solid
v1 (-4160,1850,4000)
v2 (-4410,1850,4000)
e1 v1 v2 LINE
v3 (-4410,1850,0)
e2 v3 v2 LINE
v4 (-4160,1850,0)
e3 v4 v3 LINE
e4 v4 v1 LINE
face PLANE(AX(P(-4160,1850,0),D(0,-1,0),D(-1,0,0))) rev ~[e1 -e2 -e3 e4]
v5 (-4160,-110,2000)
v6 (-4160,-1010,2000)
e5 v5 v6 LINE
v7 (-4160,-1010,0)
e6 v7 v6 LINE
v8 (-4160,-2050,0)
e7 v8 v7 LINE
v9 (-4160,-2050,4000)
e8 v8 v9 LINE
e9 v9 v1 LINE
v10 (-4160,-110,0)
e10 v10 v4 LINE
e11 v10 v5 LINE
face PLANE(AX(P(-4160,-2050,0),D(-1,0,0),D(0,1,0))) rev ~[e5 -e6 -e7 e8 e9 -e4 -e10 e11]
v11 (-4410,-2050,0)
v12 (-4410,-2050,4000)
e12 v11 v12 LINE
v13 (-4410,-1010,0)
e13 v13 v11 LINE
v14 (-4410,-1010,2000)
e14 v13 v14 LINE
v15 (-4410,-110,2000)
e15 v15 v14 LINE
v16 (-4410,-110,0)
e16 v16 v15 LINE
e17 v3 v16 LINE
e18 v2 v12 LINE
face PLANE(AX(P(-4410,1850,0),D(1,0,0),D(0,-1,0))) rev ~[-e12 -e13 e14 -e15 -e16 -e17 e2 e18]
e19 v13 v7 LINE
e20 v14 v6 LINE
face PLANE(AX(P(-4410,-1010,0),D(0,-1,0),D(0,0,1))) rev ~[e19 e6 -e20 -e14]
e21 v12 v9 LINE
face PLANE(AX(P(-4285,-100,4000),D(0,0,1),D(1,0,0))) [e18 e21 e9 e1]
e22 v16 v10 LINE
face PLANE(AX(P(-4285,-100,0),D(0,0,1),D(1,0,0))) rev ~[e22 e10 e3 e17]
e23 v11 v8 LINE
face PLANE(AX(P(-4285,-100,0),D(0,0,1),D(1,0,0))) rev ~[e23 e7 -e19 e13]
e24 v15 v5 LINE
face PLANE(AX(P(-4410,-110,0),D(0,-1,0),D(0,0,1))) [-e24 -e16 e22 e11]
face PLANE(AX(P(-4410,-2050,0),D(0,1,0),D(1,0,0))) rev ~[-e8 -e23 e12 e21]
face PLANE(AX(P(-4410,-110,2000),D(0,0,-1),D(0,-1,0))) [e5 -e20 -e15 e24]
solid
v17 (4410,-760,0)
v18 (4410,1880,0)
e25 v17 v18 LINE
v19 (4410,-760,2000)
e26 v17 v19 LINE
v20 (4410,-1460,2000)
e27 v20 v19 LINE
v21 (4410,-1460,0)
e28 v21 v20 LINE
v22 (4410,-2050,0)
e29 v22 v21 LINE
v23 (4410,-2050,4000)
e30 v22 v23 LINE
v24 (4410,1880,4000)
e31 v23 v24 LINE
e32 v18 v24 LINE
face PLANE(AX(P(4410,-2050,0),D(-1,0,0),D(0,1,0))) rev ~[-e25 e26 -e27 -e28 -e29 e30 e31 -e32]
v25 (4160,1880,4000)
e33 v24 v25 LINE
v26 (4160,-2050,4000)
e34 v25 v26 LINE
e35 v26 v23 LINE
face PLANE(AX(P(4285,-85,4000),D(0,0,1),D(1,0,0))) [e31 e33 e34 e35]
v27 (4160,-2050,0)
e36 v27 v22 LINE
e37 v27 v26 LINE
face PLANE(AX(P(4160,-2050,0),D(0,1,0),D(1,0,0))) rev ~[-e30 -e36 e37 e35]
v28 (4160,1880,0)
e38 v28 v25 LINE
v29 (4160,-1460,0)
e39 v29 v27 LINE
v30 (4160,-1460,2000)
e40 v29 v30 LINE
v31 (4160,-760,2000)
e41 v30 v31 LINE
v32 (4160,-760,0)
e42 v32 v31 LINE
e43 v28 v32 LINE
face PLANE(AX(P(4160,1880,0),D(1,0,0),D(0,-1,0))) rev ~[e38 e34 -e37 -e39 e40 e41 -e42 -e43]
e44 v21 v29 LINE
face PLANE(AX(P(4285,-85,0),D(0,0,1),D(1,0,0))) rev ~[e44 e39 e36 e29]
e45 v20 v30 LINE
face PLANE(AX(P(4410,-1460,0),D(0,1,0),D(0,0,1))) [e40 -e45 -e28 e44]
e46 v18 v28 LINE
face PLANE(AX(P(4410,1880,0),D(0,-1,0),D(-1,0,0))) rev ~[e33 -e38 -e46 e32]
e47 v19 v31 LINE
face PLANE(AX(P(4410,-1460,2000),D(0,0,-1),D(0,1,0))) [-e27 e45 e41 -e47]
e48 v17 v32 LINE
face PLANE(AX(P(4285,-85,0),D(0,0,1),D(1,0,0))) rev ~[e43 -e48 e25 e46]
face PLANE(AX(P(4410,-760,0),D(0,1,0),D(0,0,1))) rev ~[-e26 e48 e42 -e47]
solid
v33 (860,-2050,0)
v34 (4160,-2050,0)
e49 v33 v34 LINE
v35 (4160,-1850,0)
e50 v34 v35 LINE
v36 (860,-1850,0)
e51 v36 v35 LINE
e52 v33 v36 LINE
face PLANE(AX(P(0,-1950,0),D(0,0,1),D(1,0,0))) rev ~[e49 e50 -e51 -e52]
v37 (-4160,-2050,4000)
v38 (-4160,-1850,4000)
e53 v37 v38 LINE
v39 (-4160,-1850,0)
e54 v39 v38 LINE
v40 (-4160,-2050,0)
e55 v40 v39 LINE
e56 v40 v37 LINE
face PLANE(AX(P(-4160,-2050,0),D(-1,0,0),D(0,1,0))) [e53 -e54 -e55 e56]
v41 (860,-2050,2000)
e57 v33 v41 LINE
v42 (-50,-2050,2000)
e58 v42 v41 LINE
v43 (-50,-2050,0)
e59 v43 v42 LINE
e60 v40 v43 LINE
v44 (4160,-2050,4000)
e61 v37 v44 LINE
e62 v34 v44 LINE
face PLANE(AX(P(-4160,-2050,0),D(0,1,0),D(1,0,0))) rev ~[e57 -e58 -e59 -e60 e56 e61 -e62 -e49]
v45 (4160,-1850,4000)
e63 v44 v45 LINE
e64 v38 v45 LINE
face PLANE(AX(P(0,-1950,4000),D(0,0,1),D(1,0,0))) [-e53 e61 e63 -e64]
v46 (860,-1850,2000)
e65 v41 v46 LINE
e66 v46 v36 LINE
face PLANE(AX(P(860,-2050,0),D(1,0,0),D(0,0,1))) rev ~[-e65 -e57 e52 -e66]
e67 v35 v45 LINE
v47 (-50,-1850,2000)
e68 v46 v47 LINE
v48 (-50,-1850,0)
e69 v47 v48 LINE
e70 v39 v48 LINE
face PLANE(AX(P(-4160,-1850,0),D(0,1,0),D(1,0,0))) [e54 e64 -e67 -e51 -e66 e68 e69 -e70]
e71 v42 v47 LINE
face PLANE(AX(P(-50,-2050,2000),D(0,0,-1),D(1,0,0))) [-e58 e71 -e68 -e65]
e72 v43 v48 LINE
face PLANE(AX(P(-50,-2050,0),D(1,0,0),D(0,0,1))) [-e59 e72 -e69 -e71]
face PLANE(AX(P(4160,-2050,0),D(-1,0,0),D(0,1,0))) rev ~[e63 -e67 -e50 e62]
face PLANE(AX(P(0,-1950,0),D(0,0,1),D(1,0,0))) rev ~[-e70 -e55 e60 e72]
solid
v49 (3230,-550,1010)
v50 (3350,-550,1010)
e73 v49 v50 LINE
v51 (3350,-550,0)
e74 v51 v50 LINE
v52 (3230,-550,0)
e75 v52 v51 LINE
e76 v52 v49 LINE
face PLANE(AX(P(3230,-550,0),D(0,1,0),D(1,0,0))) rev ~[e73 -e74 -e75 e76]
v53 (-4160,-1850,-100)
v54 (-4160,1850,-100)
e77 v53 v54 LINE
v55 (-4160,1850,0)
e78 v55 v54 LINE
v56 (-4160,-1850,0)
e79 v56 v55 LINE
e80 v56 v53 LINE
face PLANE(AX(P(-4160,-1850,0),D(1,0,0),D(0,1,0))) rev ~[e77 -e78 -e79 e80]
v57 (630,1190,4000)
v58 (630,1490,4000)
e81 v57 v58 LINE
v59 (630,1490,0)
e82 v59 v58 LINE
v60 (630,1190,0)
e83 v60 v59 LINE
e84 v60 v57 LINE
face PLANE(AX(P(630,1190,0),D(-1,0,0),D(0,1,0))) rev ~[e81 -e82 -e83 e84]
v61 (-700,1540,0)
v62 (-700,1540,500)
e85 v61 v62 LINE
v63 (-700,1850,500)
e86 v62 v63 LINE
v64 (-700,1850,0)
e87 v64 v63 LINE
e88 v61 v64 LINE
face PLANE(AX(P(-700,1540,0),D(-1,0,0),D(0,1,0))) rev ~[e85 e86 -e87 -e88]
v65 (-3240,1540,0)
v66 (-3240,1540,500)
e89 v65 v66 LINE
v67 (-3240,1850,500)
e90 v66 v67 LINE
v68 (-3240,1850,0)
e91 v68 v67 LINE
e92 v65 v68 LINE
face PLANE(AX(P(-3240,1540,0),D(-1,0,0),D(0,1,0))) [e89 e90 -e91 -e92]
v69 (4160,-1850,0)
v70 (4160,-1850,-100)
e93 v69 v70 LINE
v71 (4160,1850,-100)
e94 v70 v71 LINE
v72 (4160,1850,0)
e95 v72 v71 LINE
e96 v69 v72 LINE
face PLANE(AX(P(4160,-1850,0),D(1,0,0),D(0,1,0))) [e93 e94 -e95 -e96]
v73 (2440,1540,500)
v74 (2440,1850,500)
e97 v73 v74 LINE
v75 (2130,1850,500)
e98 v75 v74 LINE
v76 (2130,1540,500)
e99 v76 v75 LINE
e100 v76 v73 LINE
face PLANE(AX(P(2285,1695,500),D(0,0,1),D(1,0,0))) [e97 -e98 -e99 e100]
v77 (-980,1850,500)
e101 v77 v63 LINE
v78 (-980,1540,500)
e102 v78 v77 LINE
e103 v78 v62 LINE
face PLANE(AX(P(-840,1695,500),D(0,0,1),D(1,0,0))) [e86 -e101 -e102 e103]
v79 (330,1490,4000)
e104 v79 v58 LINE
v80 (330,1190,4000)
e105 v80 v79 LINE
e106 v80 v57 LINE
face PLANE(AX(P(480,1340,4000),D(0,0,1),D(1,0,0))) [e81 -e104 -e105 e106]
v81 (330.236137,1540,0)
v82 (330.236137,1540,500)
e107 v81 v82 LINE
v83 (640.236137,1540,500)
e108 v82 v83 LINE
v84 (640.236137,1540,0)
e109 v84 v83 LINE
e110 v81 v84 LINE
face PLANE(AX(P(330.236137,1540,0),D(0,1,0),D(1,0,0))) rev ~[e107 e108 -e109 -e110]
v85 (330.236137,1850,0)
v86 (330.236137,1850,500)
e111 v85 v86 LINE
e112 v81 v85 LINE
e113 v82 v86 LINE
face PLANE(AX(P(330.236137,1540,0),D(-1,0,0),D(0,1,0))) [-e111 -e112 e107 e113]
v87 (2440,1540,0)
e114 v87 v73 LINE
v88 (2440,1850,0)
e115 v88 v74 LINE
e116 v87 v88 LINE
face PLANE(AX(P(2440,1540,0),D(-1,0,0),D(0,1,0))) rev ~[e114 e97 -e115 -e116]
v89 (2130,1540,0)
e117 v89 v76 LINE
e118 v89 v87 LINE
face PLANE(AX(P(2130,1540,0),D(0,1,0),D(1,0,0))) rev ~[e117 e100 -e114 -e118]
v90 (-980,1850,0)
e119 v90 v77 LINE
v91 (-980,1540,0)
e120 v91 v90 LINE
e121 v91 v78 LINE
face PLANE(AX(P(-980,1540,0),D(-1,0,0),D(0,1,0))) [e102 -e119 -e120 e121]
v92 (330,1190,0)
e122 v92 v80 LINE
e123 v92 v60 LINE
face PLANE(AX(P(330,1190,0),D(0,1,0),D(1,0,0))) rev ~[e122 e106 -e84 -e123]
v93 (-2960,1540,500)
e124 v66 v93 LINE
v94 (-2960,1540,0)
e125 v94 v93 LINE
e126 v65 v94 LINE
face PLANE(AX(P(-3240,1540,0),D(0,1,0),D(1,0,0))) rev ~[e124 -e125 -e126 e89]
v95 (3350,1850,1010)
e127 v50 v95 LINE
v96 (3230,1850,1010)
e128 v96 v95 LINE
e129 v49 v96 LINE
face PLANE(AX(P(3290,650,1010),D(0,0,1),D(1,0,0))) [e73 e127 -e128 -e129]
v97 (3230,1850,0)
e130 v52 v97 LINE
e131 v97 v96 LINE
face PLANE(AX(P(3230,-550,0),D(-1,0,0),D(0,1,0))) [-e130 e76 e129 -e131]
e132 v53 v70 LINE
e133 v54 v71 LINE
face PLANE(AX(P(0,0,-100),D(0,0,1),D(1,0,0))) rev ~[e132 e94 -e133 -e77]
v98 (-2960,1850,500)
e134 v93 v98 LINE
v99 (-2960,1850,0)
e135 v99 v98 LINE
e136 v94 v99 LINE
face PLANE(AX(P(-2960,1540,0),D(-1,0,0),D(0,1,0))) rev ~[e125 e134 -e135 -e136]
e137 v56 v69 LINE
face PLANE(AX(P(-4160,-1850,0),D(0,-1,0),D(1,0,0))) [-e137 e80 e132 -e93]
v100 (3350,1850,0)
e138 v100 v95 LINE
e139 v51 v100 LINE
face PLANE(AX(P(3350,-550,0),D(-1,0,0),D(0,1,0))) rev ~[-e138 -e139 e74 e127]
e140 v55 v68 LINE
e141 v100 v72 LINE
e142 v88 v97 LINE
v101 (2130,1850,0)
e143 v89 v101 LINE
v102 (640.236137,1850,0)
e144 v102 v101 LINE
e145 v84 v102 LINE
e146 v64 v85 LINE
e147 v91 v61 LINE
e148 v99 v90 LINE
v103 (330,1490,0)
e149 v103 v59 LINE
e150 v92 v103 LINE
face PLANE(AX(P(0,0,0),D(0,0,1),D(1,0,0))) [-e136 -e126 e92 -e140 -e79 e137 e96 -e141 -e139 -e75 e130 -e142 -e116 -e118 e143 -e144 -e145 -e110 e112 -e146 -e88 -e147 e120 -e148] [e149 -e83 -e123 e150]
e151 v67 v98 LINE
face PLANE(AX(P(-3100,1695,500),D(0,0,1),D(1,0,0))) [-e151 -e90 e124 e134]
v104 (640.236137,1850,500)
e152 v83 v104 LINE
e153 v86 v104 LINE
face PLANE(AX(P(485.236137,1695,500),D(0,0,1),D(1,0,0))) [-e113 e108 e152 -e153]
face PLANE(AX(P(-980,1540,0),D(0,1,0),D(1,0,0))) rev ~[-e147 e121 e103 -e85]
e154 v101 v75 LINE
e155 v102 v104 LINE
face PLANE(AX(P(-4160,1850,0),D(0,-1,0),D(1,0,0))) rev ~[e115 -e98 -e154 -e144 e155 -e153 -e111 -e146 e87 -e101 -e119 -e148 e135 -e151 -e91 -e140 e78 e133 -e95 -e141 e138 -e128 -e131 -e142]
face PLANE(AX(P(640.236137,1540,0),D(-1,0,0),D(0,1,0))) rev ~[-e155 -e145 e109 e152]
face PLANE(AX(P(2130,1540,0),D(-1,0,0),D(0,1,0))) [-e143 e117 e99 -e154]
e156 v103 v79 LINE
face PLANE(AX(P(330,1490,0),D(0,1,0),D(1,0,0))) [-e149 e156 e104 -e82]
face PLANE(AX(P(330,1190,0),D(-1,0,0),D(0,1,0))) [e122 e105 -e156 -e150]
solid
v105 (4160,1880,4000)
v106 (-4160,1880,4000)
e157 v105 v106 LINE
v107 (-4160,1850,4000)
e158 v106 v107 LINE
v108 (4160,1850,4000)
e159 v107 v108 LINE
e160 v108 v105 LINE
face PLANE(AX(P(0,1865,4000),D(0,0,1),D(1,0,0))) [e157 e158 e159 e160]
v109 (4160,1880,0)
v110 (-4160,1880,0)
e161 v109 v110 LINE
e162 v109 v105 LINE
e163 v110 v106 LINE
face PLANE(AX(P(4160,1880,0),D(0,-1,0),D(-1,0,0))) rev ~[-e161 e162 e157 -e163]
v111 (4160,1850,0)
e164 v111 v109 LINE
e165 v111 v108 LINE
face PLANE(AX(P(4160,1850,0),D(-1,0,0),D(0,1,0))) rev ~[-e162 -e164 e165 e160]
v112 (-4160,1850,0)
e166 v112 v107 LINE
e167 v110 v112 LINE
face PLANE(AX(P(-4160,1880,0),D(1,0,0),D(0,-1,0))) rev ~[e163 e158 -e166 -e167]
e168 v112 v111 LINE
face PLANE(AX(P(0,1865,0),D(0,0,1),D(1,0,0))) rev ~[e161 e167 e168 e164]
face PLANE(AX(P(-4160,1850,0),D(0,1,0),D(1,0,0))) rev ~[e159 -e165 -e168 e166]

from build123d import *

# Parameters (mm, degrees)
F1_W      = 8320
F1_H      = 3700
F2_DEPTH  = 100
F3_W      = 300
F3_H      = 300
F4_DEPTH  = 4000
F3_W_2    = 280
F3_H_2    = 310
F3_W_3    = 310
F5_DEPTH  = 500
F3_W_4    = 120
F3_H_3    = 2400
F6_DEPTH  = 1010
F8_DEPTH  = 4000
F9_DEPTH  = 4000
F10_DEPTH = 4000
F7_W      = 8320
F7_H      = 200
F11_DEPTH = 4000
F12_W     = 700
F12_H     = 2000
F13_DEPTH = 8820.001
F14_W     = 900
F14_H     = 2000
F15_DEPTH = 8820.001
F16_W     = 910
F16_H     = 2000
F17_DEPTH = 3930.001


with BuildPart() as f2:
    # F1 (on Top) → F2 (new body)
    with BuildSketch(Plane.XY):
        Rectangle(F1_W, F1_H)
    extrude(amount=-F2_DEPTH)

    # F3 (on face) → F4 (join)
    with BuildSketch(Plane.XY):
        with Locations((480, 1340)):
            Rectangle(F3_W, F3_H)
    extrude(amount=F4_DEPTH)

    # F3 (on face) → F5 (join)
    with BuildSketch(Plane.XY):
        with Locations((-3100, 1695)):
            Rectangle(F3_W_2, F3_H_2)
        with Locations((-840, 1695)):
            Rectangle(F3_W_2, F3_H_2)
        with Locations((2285, 1695)):
            Rectangle(F3_W_3, F3_H_2)
        with Locations((485.2361369133, 1695)):
            Rectangle(F3_W_3, F3_H_2)
    extrude(amount=F5_DEPTH)

    # F3 (on face) → F6 (join)
    with BuildSketch(Plane.XY):
        with Locations((3290, 650)):
            Rectangle(F3_W_4, F3_H_3)
    extrude(amount=F6_DEPTH)


with BuildPart() as f8:
    # F7 (on face) → F8 (new body)
    with BuildSketch(Plane.XY):
        Polygon((-4160, 1880), (-4160, 1850), (-3240, 1850), (-2960, 1850), (-980, 1850), (-700, 1850), (330.2361369133, 1850), (640.2361369133, 1850), (2130, 1850), (2440, 1850), (3230, 1850), (3350, 1850), (4160, 1850), (4160, 1880), align=None)
    extrude(amount=F8_DEPTH)


with BuildPart() as f9:
    # F7 (on face) → F9 (new body)
    with BuildSketch(Plane.XY):
        Polygon((4410, 1880), (4160, 1880), (4160, 1850), (4160, -1850), (4160, -2050), (4410, -2050), align=None)
    extrude(amount=F9_DEPTH)

    # F12 (on face) → F13 (cut, through all)
    with BuildSketch(Plane.YZ.offset(4410)):
        with Locations((-1110, 1000)):
            Rectangle(F12_W, F12_H)
    extrude(amount=-F13_DEPTH, mode=Mode.SUBTRACT)


with BuildPart() as f10:
    # F7 (on face) → F10 (new body)
    with BuildSketch(Plane.XY):
        Polygon((-4160, -1850), (-4160, 1850), (-4410, 1850), (-4410, -2050), (-4160, -2050), align=None)
    extrude(amount=F10_DEPTH)

    # F14 (on face) → F15 (cut, through all)
    with BuildSketch(Plane(origin=(-4410, 0, 0), x_dir=(0, -1, 0), z_dir=(-1, 0, 0))):
        with Locations((560, 1000)):
            Rectangle(F14_W, F14_H)
    extrude(amount=-F15_DEPTH, mode=Mode.SUBTRACT)


with BuildPart() as f11:
    # F7 (on face) → F11 (new body)
    with BuildSketch(Plane.XY):
        with Locations((0, -1950)):
            Rectangle(F7_W, F7_H)
    extrude(amount=F11_DEPTH)

    # F16 (on face) → F17 (cut, through all)
    with BuildSketch(Plane.XZ.offset(2050)):
        with Locations((405, 1000)):
            Rectangle(F16_W, F16_H)
    extrude(amount=-F17_DEPTH, mode=Mode.SUBTRACT)


solid = Compound([f2.part, f8.part, f9.part, f10.part, f11.part])
